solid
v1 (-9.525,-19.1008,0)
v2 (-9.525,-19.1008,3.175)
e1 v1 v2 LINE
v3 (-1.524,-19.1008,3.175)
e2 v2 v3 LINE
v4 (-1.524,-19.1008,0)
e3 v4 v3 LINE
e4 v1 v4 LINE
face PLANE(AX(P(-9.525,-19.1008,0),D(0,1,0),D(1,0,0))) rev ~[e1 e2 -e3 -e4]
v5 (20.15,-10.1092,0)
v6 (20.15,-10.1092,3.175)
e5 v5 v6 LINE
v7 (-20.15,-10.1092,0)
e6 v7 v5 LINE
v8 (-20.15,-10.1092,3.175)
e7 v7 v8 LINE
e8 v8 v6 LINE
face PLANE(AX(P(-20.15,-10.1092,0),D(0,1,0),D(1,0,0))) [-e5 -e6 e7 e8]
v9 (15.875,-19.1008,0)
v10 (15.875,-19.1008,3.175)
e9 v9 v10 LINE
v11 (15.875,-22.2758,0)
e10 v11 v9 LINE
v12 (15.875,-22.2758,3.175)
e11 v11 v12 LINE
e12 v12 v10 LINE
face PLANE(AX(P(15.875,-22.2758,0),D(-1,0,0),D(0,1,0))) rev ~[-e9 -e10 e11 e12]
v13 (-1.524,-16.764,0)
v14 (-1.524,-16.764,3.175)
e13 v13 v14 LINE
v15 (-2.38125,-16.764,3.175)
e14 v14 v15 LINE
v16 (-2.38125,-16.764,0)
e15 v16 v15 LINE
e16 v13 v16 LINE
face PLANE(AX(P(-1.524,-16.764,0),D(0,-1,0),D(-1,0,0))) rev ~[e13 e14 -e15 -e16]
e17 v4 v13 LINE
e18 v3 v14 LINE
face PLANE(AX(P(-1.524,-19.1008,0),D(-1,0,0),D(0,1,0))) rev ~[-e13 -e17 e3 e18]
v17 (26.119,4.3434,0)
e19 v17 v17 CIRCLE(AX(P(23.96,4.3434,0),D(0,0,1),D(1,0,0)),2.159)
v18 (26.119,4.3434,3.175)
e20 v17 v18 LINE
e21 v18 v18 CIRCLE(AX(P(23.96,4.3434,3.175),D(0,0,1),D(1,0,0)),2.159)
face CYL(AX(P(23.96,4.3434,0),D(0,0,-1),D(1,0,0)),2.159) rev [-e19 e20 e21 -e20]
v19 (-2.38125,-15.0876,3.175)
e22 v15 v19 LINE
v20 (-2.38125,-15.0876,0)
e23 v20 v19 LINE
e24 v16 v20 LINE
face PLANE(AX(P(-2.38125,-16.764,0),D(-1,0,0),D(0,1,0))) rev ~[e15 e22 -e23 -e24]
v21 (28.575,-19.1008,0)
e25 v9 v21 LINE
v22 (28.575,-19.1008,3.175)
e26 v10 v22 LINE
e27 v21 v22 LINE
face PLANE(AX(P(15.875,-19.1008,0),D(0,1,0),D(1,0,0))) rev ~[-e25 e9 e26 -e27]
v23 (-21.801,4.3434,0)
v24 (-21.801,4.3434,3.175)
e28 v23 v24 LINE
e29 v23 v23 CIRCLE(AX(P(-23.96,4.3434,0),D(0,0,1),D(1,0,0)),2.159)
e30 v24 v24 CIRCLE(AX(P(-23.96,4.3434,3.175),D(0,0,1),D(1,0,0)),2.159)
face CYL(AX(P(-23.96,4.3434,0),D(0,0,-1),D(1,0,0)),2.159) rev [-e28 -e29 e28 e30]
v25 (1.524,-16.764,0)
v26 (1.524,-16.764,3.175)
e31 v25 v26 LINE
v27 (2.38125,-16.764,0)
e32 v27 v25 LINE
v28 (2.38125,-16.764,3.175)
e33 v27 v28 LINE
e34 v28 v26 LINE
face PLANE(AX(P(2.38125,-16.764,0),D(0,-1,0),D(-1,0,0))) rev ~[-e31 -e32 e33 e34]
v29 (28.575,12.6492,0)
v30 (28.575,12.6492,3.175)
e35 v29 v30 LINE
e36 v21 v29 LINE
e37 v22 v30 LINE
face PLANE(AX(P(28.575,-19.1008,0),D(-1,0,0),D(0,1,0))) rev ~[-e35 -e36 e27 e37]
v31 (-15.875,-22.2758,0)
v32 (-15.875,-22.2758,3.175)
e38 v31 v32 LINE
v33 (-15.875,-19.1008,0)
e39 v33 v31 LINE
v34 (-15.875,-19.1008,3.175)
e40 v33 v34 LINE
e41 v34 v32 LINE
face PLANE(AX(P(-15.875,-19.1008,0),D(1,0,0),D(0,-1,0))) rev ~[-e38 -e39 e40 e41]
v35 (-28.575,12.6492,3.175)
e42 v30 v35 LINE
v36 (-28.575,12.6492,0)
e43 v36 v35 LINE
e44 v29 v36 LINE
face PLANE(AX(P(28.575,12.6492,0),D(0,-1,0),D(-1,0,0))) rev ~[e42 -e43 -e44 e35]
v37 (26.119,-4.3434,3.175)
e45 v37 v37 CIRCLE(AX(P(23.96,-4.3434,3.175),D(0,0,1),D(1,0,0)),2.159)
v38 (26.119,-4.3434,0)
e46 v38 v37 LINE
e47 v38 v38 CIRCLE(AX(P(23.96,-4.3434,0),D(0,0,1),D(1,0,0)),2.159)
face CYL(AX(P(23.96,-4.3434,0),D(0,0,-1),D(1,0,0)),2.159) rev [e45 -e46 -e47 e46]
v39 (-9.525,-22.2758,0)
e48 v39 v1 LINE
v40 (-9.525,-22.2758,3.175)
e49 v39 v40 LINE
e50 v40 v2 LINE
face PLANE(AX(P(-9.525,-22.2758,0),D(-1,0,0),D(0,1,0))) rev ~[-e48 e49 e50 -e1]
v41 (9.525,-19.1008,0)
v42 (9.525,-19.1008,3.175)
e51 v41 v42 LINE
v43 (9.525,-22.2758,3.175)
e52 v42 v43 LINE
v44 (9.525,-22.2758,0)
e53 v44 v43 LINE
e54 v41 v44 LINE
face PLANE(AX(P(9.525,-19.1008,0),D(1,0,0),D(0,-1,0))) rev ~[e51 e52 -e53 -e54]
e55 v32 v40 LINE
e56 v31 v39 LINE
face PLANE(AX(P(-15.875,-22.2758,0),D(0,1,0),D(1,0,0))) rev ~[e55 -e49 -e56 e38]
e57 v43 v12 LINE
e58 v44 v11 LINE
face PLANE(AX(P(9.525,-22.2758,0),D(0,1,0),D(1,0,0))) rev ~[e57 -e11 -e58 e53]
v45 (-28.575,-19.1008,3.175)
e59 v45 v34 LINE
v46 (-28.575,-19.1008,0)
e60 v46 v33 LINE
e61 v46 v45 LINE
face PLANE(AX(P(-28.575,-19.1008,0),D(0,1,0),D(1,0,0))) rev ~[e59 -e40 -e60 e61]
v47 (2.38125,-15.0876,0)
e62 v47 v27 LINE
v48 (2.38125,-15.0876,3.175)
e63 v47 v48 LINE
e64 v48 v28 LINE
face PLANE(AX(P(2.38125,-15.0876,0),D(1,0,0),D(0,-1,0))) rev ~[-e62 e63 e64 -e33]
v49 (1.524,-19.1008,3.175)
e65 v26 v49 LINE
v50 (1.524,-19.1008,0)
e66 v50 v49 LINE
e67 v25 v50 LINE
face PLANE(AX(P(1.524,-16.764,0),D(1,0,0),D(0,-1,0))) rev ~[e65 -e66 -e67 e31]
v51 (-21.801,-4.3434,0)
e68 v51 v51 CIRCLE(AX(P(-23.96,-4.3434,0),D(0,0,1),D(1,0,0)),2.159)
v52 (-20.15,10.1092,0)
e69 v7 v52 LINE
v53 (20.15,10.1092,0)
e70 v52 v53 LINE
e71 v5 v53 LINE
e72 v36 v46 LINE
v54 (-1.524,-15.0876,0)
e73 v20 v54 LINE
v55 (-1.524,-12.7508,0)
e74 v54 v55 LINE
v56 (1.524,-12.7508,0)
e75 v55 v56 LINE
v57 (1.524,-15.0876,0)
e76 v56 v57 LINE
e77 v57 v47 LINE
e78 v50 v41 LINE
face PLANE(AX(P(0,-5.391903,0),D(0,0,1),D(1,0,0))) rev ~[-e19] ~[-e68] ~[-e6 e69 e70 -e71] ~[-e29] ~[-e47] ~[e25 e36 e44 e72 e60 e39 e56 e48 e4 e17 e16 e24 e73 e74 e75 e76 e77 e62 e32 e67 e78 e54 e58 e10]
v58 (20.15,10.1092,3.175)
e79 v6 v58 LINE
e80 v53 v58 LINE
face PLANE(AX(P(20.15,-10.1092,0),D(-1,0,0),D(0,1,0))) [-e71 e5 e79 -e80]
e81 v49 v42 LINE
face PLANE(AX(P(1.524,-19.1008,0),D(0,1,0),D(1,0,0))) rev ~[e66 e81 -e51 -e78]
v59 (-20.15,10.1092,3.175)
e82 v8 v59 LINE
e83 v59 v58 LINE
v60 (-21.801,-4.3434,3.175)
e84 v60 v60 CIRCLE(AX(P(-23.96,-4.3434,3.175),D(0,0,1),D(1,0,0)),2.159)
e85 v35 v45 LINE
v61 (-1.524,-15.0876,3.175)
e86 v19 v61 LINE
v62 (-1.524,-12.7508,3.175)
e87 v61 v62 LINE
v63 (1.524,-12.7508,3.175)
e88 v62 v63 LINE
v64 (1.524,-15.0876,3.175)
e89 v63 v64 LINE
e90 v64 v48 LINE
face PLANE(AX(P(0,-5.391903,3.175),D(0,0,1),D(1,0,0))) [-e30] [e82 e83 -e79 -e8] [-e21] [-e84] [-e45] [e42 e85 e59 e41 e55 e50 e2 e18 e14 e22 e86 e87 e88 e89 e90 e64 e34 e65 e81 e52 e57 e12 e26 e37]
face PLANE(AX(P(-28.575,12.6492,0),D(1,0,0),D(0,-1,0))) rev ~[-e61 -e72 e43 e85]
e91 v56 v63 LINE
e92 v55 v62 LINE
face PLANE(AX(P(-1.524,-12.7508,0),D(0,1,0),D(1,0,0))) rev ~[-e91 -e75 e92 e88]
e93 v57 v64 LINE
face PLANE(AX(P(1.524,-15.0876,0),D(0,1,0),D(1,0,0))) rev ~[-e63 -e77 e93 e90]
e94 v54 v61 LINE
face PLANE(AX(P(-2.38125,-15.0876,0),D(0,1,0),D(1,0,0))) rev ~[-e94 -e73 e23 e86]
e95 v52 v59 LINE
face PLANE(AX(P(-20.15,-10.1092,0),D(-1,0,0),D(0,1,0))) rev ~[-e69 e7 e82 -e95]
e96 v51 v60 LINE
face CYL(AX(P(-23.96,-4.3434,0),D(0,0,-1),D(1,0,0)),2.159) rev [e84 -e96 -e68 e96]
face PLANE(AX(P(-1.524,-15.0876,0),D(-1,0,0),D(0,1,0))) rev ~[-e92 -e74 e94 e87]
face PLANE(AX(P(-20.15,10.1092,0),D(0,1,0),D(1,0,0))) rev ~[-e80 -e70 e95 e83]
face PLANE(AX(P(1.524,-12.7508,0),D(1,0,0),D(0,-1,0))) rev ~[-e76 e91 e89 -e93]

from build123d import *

# Parameters (mm, degrees)
F0_R     = 2.159
F0_W     = 40.3
F0_H     = 20.2184
F1_DEPTH = 3.175


# Not quite as in the source:
# - a length typed as a fraction of an inch, garbled in the dataset ("3 / 203.2 mm" for 3/8 in), is restored


with BuildPart() as f1:
    # F0 (on Top) → F1 (new body)
    with BuildSketch(Plane.XY):
        Polygon((28.575, -19.1008), (28.575, 12.6492), (-28.575, 12.6492), (-28.575, -19.1008), (-15.875, -19.1008), (-15.875, -22.2758), (-9.525, -22.2758), (-9.525, -19.1008), (-1.524, -19.1008), (-1.524, -16.764), (-2.38125, -16.764), (-2.38125, -15.0876), (-1.524, -15.0876), (-1.524, -12.7508), (1.524, -12.7508), (1.524, -15.0876), (2.38125, -15.0876), (2.38125, -16.764), (1.524, -16.764), (1.524, -19.1008), (9.525, -19.1008), (9.525, -22.2758), (15.875, -22.2758), (15.875, -19.1008), align=None)
        with Locations((-23.96, -4.3434)):
            Circle(F0_R, mode=Mode.SUBTRACT)
        with Locations((-23.96, 4.3434)):
            Circle(F0_R, mode=Mode.SUBTRACT)
        Rectangle(F0_W, F0_H, mode=Mode.SUBTRACT)
        with Locations((23.96, -4.3434)):
            Circle(F0_R, mode=Mode.SUBTRACT)
        with Locations((23.96, 4.3434)):
            Circle(F0_R, mode=Mode.SUBTRACT)
    extrude(amount=F1_DEPTH)


solid = f1.part
